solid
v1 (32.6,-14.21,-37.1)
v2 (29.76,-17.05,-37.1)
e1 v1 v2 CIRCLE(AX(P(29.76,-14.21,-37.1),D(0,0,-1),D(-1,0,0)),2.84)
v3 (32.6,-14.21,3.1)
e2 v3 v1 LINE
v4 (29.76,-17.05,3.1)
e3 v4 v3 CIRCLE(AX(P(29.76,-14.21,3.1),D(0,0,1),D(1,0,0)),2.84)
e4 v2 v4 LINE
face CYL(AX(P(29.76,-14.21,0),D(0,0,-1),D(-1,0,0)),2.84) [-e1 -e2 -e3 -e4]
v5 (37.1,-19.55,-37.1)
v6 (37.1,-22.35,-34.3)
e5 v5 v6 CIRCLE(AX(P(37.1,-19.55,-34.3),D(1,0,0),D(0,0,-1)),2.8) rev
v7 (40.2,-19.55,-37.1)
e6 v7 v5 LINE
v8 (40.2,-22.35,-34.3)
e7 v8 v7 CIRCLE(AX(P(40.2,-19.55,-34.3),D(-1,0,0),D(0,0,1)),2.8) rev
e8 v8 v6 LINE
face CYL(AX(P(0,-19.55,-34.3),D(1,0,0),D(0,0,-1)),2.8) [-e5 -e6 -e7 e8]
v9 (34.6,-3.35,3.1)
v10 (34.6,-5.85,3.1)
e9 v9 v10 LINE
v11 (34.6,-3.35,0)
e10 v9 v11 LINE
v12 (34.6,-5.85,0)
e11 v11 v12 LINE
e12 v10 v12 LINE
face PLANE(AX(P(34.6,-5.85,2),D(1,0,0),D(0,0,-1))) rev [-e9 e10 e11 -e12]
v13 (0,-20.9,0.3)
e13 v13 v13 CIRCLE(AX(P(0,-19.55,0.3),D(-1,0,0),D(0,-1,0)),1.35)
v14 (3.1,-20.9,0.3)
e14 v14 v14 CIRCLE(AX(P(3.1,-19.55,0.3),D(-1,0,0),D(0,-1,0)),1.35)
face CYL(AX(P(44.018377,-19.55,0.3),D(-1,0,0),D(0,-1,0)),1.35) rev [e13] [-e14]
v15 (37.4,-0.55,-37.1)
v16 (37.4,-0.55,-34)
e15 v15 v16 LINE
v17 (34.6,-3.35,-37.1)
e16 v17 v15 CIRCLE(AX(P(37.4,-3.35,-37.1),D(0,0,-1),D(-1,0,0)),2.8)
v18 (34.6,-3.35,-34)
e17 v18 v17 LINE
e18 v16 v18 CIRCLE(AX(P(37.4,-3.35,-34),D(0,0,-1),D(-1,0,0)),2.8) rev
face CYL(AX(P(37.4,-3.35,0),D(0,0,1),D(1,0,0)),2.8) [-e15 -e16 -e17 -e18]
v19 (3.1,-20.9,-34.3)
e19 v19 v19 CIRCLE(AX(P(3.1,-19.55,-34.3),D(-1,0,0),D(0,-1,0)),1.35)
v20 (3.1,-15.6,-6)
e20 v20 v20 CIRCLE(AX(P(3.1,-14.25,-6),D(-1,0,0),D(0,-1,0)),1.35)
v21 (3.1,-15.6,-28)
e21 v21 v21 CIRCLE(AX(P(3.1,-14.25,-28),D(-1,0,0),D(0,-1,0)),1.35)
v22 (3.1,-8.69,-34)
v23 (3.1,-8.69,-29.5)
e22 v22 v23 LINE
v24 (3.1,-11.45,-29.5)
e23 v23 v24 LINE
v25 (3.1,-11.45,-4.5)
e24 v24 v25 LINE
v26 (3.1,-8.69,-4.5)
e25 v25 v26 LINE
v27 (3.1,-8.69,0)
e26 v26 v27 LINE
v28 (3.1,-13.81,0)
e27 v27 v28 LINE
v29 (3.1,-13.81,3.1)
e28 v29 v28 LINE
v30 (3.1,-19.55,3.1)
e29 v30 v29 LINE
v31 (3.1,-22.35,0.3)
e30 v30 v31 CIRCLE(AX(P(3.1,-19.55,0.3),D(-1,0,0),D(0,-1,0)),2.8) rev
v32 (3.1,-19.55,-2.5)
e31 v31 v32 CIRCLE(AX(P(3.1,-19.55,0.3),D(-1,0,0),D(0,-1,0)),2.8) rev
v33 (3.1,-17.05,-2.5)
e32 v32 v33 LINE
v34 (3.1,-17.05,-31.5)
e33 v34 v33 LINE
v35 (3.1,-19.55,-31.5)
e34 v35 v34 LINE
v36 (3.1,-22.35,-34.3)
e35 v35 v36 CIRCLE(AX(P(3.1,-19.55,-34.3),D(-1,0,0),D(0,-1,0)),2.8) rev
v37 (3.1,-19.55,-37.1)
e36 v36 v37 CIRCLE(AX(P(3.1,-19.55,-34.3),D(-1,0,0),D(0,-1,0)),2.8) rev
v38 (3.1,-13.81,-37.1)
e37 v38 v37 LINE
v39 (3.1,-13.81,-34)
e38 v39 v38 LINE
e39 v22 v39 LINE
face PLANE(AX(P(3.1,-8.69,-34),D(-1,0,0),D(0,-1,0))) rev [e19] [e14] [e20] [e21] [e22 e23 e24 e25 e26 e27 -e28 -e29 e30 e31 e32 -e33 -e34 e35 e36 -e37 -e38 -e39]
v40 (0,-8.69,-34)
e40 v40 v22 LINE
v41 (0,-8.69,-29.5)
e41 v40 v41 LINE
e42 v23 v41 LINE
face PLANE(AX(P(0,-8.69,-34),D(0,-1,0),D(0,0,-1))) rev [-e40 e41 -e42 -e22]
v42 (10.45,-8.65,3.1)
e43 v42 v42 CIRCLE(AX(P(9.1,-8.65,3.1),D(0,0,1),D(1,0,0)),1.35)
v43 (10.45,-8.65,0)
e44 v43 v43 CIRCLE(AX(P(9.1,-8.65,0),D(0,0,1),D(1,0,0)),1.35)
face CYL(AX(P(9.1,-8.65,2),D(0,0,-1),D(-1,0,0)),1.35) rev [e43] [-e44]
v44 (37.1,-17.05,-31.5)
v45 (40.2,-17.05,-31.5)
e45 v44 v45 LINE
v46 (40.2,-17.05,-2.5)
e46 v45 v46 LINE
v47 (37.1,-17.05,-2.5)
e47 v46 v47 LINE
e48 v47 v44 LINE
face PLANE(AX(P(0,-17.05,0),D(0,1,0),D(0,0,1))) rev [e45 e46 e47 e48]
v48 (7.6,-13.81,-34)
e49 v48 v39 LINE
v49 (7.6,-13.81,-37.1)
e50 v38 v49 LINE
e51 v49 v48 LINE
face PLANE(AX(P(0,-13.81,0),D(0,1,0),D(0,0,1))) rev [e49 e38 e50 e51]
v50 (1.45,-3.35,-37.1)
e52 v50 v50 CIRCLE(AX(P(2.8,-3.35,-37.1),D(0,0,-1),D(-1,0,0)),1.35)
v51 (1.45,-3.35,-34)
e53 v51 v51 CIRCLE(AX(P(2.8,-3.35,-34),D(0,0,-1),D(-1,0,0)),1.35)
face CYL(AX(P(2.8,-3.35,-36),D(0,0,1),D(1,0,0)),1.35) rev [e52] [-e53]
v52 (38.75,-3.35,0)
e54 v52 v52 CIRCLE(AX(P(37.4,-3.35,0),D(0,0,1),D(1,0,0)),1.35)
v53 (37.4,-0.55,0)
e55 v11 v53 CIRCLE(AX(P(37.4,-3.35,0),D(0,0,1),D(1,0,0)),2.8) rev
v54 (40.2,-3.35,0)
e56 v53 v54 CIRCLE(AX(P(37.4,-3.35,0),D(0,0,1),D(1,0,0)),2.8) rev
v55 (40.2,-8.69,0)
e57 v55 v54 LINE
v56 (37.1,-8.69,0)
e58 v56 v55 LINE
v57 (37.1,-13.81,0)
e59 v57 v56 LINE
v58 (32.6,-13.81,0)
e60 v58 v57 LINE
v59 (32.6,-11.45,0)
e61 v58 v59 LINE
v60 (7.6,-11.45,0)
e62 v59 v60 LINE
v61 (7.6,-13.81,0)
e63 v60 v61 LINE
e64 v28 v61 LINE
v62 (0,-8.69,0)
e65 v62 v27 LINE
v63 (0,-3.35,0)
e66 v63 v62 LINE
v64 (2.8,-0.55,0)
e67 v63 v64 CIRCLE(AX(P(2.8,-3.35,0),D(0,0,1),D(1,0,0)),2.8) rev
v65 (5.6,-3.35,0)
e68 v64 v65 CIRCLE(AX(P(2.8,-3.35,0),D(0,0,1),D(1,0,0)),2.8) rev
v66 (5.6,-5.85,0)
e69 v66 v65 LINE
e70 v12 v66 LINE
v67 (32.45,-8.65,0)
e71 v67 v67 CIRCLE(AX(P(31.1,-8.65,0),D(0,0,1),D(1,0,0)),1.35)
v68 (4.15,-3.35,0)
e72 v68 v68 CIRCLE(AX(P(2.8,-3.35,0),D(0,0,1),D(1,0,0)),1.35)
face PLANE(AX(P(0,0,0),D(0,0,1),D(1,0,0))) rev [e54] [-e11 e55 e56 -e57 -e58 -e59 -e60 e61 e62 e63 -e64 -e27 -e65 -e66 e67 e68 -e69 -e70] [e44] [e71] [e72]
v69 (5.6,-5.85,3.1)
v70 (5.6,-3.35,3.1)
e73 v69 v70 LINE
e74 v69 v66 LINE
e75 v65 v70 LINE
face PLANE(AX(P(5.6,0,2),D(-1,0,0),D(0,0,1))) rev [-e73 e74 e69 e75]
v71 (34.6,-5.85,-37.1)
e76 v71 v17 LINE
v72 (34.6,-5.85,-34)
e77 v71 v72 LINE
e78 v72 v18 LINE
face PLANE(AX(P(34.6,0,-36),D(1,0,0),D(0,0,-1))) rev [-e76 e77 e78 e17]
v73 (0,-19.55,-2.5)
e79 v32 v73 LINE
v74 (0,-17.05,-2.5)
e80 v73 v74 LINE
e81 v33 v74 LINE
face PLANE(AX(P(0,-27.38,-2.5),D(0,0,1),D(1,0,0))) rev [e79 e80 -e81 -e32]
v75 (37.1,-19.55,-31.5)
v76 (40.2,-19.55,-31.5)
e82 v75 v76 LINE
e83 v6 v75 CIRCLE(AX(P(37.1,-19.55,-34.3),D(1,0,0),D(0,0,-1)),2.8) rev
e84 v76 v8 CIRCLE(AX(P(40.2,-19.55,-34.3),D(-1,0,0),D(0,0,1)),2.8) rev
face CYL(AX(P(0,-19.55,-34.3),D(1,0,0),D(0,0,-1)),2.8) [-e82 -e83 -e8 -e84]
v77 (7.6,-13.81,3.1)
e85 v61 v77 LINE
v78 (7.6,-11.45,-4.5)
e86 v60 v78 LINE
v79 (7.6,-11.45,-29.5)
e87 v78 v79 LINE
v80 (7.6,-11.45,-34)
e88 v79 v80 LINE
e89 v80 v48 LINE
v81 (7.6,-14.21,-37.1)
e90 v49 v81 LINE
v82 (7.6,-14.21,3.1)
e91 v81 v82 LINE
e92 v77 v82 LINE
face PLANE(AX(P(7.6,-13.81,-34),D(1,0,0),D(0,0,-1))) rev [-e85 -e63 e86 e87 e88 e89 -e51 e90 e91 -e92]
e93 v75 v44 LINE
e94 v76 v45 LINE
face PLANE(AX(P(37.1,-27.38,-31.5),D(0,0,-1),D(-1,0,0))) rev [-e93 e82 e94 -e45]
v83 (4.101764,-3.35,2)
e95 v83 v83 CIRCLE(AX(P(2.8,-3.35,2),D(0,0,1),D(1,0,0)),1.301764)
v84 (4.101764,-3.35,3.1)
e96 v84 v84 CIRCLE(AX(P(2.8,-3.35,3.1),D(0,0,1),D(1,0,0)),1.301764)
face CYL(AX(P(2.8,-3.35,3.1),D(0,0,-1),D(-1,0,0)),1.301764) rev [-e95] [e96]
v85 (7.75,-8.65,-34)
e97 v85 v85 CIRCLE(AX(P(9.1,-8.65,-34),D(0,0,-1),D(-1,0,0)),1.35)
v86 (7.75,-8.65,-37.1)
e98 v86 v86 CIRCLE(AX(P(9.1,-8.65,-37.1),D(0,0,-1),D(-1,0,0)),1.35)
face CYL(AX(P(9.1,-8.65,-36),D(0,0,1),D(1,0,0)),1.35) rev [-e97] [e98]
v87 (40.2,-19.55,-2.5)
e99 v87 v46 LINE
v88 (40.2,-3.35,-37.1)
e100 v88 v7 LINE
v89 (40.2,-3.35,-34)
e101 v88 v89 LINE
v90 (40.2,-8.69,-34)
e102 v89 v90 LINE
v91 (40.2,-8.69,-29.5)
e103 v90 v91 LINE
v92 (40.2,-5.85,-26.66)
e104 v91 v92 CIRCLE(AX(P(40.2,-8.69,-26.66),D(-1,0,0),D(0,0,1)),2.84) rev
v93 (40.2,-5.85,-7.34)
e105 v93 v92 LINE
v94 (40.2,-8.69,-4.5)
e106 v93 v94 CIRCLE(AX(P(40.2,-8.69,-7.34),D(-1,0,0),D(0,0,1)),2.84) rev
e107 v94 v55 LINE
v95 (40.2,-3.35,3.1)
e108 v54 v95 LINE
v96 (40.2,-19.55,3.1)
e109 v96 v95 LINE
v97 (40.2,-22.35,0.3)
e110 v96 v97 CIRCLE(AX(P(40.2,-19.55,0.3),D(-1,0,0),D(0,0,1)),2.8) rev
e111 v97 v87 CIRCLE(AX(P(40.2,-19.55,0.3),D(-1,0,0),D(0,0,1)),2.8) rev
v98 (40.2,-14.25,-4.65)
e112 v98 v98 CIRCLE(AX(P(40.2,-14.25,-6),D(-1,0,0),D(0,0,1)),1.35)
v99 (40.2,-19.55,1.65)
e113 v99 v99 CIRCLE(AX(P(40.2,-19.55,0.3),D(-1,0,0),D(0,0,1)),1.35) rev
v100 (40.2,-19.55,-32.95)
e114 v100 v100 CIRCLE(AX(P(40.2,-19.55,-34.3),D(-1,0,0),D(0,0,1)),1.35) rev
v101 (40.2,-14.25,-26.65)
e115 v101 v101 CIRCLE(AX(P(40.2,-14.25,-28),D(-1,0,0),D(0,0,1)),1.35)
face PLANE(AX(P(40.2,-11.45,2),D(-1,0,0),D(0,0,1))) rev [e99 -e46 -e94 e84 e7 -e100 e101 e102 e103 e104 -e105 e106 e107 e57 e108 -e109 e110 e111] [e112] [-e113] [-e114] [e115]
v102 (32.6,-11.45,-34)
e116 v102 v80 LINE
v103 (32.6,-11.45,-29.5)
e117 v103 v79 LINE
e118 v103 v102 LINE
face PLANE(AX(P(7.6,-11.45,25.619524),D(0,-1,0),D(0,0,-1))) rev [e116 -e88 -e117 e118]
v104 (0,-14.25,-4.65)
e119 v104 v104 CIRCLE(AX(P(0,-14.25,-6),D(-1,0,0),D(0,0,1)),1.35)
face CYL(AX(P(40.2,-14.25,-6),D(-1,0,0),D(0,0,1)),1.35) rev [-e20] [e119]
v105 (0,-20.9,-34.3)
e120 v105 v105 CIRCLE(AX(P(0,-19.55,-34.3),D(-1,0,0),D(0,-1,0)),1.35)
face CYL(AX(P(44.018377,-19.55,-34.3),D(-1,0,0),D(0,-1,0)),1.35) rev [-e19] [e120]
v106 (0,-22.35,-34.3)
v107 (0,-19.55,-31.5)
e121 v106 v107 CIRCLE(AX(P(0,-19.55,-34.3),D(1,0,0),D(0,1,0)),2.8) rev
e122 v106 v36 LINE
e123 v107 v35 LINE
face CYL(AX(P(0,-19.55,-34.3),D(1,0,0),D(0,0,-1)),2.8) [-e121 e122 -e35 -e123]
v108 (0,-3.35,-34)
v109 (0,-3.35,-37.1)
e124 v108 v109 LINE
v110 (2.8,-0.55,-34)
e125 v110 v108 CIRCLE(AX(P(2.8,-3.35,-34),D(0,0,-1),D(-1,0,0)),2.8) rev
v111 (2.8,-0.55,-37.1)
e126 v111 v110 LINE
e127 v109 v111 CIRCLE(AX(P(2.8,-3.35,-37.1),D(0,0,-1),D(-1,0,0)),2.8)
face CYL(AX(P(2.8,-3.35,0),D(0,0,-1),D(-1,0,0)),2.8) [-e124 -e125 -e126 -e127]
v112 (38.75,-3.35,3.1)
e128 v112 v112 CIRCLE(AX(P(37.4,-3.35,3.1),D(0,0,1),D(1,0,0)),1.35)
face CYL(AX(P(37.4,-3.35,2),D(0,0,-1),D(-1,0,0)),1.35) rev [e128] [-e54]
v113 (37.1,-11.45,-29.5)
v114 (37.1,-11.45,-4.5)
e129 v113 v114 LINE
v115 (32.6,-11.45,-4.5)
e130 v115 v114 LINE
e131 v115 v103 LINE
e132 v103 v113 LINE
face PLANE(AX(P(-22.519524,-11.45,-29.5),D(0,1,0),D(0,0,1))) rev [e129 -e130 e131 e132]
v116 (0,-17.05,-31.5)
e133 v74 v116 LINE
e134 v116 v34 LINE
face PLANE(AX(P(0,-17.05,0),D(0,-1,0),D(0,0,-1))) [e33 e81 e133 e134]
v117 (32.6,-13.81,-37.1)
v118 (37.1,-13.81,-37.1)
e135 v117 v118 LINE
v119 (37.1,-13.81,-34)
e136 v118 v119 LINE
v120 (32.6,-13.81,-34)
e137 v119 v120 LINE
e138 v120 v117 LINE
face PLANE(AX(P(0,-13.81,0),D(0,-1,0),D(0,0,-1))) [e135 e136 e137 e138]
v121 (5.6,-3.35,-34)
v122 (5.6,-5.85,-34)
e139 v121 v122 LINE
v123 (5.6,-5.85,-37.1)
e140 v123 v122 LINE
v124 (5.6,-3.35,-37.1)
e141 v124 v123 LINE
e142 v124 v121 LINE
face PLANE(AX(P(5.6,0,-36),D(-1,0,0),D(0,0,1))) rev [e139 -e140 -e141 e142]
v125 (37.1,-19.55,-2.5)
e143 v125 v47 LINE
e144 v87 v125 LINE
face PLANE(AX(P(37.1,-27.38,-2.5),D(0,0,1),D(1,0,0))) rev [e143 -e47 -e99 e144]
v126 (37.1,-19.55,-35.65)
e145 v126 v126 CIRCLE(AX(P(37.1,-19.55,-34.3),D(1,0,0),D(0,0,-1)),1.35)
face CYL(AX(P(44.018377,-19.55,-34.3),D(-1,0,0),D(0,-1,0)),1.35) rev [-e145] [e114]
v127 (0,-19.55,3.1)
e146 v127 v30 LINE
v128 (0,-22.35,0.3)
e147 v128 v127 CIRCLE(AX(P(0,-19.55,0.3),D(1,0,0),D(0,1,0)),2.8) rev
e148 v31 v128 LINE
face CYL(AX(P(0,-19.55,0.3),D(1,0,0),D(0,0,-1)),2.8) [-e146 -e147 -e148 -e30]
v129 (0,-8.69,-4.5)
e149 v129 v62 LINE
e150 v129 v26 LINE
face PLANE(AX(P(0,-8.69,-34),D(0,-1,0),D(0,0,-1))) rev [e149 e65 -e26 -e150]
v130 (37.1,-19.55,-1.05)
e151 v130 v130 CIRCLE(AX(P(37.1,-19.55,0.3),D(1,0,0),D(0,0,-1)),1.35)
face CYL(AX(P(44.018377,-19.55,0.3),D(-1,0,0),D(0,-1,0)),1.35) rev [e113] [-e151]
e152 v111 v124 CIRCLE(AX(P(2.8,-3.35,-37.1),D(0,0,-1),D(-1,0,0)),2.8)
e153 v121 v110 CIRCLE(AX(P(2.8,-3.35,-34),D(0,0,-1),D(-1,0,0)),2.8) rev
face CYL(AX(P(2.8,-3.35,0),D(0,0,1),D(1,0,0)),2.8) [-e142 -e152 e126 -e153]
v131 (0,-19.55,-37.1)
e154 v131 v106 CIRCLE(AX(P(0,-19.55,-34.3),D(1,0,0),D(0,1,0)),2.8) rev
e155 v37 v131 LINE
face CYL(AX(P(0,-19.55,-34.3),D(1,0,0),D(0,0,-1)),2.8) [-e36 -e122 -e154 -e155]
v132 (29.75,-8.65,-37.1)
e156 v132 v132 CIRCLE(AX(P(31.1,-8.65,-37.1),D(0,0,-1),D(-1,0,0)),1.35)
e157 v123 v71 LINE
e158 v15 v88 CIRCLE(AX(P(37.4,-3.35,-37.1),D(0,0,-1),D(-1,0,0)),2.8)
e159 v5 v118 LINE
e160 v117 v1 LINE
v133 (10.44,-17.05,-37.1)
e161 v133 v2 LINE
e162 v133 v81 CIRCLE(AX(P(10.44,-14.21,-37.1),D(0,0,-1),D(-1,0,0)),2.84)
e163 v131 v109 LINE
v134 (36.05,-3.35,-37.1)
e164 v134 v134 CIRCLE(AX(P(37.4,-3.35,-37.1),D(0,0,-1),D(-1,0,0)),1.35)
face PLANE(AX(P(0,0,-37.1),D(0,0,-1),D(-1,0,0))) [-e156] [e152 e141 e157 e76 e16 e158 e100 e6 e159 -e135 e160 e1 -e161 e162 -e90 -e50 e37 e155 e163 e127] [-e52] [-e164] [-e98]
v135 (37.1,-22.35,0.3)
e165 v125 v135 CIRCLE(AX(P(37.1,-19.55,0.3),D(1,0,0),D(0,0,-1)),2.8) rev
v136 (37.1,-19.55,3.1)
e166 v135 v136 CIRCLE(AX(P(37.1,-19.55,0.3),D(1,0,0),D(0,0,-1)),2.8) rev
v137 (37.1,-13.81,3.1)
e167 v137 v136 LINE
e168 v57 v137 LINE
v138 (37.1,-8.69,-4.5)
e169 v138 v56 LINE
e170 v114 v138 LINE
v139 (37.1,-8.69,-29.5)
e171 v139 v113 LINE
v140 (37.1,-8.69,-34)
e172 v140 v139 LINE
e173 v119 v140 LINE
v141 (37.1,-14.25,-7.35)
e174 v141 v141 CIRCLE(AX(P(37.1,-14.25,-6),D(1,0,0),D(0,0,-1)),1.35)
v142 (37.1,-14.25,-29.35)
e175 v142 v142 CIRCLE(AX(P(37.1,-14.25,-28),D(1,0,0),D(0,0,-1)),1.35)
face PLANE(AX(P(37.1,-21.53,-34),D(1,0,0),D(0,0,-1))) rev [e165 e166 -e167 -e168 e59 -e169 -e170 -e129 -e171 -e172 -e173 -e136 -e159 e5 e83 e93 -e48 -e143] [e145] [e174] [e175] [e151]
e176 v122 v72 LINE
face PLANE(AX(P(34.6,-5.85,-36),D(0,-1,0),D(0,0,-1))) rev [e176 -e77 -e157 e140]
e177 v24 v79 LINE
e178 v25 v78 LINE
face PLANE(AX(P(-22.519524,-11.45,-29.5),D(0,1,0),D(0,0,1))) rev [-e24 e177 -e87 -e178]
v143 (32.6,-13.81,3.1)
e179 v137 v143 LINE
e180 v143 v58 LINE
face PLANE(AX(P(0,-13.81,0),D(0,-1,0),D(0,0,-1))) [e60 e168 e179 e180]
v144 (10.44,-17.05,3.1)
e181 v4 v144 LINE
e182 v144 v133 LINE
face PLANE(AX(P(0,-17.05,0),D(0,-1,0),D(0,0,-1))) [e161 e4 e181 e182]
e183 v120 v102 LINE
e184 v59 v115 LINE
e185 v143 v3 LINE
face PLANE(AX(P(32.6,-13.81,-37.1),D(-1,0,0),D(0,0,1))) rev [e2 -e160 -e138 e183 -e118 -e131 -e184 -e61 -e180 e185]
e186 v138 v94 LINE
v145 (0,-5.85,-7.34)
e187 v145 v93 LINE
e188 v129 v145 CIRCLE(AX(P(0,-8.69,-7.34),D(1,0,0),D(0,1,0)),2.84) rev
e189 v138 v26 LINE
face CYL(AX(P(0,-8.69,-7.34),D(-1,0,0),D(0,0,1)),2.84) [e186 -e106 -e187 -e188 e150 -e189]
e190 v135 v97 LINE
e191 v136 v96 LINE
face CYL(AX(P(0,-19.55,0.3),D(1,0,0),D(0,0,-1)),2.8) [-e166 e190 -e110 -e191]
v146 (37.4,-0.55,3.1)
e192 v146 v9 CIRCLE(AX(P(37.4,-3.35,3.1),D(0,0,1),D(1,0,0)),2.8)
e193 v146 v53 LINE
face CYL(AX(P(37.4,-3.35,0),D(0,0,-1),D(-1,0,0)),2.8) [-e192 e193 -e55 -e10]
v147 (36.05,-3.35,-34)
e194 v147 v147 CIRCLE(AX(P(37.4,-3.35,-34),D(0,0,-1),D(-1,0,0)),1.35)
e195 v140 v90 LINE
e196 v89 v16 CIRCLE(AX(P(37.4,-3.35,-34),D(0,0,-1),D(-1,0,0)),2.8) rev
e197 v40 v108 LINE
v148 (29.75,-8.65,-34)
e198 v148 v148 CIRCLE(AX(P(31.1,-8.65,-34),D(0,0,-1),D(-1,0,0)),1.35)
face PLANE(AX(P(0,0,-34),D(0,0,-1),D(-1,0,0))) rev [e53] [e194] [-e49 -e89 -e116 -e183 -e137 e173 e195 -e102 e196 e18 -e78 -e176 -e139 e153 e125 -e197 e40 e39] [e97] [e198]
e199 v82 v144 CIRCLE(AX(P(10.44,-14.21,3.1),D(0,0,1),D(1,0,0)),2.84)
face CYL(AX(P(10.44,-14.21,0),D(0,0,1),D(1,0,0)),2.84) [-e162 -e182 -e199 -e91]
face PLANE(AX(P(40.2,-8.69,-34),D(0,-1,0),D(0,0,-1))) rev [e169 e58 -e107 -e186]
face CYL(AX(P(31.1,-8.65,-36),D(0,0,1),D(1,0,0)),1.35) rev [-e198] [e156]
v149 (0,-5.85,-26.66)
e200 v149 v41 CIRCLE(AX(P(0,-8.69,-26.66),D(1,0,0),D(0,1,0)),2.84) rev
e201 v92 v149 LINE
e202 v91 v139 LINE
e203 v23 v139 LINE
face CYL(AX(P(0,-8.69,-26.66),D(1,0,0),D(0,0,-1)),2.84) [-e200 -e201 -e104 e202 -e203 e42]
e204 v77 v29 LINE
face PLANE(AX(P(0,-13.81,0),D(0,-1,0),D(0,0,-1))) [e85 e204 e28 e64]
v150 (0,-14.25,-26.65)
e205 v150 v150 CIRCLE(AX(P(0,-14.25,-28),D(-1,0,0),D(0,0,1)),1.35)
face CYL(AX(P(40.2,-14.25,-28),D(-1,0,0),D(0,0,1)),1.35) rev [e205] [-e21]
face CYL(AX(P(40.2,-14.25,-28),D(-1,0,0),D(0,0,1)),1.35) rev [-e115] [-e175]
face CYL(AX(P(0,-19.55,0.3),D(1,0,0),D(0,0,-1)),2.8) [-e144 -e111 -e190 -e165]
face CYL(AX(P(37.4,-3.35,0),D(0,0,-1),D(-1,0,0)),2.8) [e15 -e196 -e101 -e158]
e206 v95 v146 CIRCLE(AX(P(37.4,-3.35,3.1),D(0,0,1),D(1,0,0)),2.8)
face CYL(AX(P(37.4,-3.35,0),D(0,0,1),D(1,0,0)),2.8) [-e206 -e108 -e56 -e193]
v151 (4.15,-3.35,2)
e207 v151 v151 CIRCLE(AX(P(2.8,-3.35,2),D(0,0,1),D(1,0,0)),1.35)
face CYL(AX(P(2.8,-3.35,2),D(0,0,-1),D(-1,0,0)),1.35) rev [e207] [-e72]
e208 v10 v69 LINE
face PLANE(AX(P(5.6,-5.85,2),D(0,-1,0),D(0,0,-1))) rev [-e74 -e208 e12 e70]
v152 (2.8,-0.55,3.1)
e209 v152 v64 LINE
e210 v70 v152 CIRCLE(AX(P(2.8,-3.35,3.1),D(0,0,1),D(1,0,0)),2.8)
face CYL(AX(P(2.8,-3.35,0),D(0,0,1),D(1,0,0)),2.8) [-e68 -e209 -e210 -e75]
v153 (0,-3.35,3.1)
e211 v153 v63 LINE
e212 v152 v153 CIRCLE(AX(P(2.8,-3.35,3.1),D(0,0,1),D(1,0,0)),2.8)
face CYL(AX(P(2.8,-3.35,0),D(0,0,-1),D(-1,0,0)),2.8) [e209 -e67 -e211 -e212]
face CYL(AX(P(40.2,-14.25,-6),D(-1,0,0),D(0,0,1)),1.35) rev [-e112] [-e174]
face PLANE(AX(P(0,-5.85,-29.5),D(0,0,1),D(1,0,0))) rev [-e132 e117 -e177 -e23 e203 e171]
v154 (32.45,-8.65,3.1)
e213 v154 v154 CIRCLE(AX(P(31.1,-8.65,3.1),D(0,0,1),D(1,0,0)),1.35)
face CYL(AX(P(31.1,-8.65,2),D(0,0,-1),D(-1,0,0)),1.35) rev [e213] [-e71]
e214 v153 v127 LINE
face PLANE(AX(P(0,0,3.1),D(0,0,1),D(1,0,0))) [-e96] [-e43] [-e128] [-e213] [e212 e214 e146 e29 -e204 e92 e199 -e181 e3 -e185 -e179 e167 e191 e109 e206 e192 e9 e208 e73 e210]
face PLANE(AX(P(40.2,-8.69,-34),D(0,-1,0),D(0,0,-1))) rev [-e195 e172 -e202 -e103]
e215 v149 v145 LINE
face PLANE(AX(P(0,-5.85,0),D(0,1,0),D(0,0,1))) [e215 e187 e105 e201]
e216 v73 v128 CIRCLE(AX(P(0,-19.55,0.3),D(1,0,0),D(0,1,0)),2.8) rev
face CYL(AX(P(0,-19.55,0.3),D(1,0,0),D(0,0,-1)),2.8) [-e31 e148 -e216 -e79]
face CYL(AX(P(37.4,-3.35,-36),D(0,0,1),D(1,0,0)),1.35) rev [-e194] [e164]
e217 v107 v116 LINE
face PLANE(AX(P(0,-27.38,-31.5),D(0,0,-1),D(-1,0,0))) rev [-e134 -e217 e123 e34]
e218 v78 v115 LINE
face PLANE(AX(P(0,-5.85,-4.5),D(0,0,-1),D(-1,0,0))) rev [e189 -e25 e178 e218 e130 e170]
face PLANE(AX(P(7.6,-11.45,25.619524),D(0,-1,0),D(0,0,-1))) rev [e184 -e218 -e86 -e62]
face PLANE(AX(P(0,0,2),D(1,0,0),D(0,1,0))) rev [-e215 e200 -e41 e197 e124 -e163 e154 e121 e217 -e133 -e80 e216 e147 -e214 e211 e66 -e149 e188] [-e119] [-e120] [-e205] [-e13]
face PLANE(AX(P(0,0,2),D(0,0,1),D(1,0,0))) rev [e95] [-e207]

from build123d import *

# Parameters (mm, degrees)
ESBO_O1_R                  = 1.35
RESSALTO_EXTRUS_O1_DEPTH   = 2
ESBO_O3_W                  = 40.2
ESBO_O3_H                  = 2
RESSALTO_EXTRUS_O2_DEPTH   = 10.08
ESBO_O4_W                  = 3.1
ESBO_O4_H                  = 12.84
RESSALTO_EXTRUS_O3_DEPTH   = 34
CORTE_EXTRUS_O1_DEPTH      = 55.735280213
CORTE_EXTRUS_O1_DEPTH_BACK = 55.735280213
ESBO_O5_R                  = 1.35
ESBO_O7_W                  = 37.1
ESBO_O7_H                  = 3.24
CORTE_EXTRUS_O2_DEPTH      = 2
RESSALTO_EXTRUS_O5_START   = 2
ESBO_O12_R                 = 1.35
RESSALTO_EXTRUS_O5_DEPTH   = 2
ESBO_O18_W                 = 3.1
ESBO_O18_H                 = 3.24
RESSALTO_EXTRUS_O6_DEPTH   = 2
ESBO_O19_W                 = 3.1
ESBO_O19_H                 = 3.24
RESSALTO_EXTRUS_O7_DEPTH   = 2
ESBO_O21_R                 = 1.301764144
ESBO_O21_R_2               = 1.35
RESSALTO_EXTRUS_O8_DEPTH   = 1.1
RESSALTO_EXTRUS_O9_START   = 1.1
ESBO_O22_R                 = 1.35
RESSALTO_EXTRUS_O9_DEPTH   = 1.1
ESBO_O23_W                 = 3.1
ESBO_O23_H                 = 5.6
RESSALTO_EXTRUS_O10_DEPTH  = 5.85
CORTE_EXTRUS_O3_REACH      = 63.173
ESBO_O24_R                 = 1.35
ESBO_O25_W                 = 4.5
ESBO_O25_H                 = 3.1
CORTE_EXTRUS_O6_DEPTH      = 4.48
ESBO_O27_W                 = 3.1
ESBO_O27_H                 = 29
CORTE_EXTRUS_O7_DEPTH      = 4.48
ESBO_O28_W                 = 25
ESBO_O28_H                 = 40.2
CORTE_EXTRUS_O8_DEPTH      = 1.24
ESBO_O29_W                 = 25
ESBO_O29_H                 = 5.6
RESSALTO_EXTRUS_O11_DEPTH  = 34
ESBO_O31_W                 = 3.1
ESBO_O31_H                 = 25
RESSALTO_EXTRUS_O12_DEPTH  = 2.84
ESBO_O32_W                 = 25
ESBO_O32_H                 = 5.6
RESSALTO_EXTRUS_O13_DEPTH  = 34
FILETE1_R                  = 2.84
ESBO_O33_W                 = 5.6
ESBO_O33_H                 = 3.1
CORTE_EXTRUS_O9_DEPTH      = 0.55
ESBO_O35_W                 = 3.1
ESBO_O35_H                 = 5.6
CORTE_EXTRUS_O10_DEPTH     = 5.03
FILETE2_R                  = 2.8


with BuildPart() as part:
    # Esboço1 → Ressalto-extrusão1 (new body)
    with BuildSketch(Plane.XY):
        Polygon((0, 0), (5.6, 0), (5.6, -5.85), (34.6, -5.85), (34.6, 0), (40.2, 0), (40.2, -11.45), (0, -11.45), align=None)
        with Locations((2.8, -3.35)):
            Circle(ESBO_O1_R, mode=Mode.SUBTRACT)
        with Locations((37.4, -3.35)):
            Circle(ESBO_O1_R, mode=Mode.SUBTRACT)
        with Locations((31.1, -8.65)):
            Circle(ESBO_O1_R, mode=Mode.SUBTRACT)
        with Locations((9.1, -8.65)):
            Circle(ESBO_O1_R, mode=Mode.SUBTRACT)
    extrude(amount=RESSALTO_EXTRUS_O1_DEPTH)

    # Esboço3 → Ressalto-extrusão2 (add)
    with BuildSketch(Plane.XZ.offset(11.45)):
        with Locations((20.1, 1)):
            Rectangle(ESBO_O3_W, ESBO_O3_H)
    extrude(amount=RESSALTO_EXTRUS_O2_DEPTH)

    # Esboço4 → Ressalto-extrusão3 (add)
    with BuildSketch(Plane(origin=(0, 0, 0), x_dir=(-1, 0, 0), z_dir=(0, 0, -1))):
        with Locations((-38.65, -15.11)):
            Rectangle(ESBO_O4_W, ESBO_O4_H)
        with Locations((-1.55, -15.11)):
            Rectangle(ESBO_O4_W, ESBO_O4_H)
    extrude(amount=RESSALTO_EXTRUS_O3_DEPTH)

    # Esboço5 → Corte-extrusão1 (cut, two sides: drawn at the far end of the back side and taken through both)
    with BuildSketch(Plane.ZY.offset(-37.1).offset(-CORTE_EXTRUS_O1_DEPTH_BACK)):
        with Locations((-6, -14.25)):
            Circle(ESBO_O5_R)
        with Locations((-28, -14.25)):
            Circle(ESBO_O5_R)
    extrude(amount=CORTE_EXTRUS_O1_DEPTH + CORTE_EXTRUS_O1_DEPTH_BACK, mode=Mode.SUBTRACT)

    # Esboço7 → Corte-extrusão2 (cut)
    with BuildSketch(Plane(origin=(0, 0, 0), x_dir=(-1, 0, 0), z_dir=(0, 0, -1))):
        with Locations((-18.55, -19.91)):
            Rectangle(ESBO_O7_W, ESBO_O7_H)
    extrude(amount=-CORTE_EXTRUS_O2_DEPTH, mode=Mode.SUBTRACT)

    # Esboço12 → Ressalto-extrusão5 (add)
    with BuildSketch(Plane(origin=(0, 0, -34), x_dir=(-1, 0, 0), z_dir=(0, 0, -1)).offset(RESSALTO_EXTRUS_O5_START)):
        Polygon((-5.6, 0), (0, 0), (0, -18.29), (-40.2, -18.29), (-40.2, 0), (-34.6, 0), (-34.6, -5.85), (-5.6, -5.85), align=None)
        with Locations(Location((-31.1, -8.65, 0), (0, 0, 180))):
            Circle(ESBO_O12_R, mode=Mode.SUBTRACT)
        with Locations(Location((-9.1, -8.65, 0), (0, 0, 180))):
            Circle(ESBO_O12_R, mode=Mode.SUBTRACT)
        with Locations(Location((-2.8, -3.35, 0), (0, 0, 180))):
            Circle(ESBO_O12_R, mode=Mode.SUBTRACT)
        with Locations(Location((-37.4, -3.35, 0), (0, 0, 180))):
            Circle(ESBO_O12_R, mode=Mode.SUBTRACT)
    extrude(amount=-RESSALTO_EXTRUS_O5_DEPTH)

    # Esboço18 → Ressalto-extrusão6 (add)
    with BuildSketch(Plane.XY):
        with Locations((1.55, -19.91)):
            Rectangle(ESBO_O18_W, ESBO_O18_H)
    extrude(amount=RESSALTO_EXTRUS_O6_DEPTH)

    # Esboço19 → Ressalto-extrusão7 (add)
    with BuildSketch(Plane(origin=(0, 0, -34), x_dir=(-1, 0, 0), z_dir=(0, 0, -1))):
        with Locations((-1.55, -19.91)):
            Rectangle(ESBO_O19_W, ESBO_O19_H)
        with Locations((-38.65, -19.91)):
            Rectangle(ESBO_O19_W, ESBO_O19_H)
    extrude(amount=RESSALTO_EXTRUS_O7_DEPTH)

    # Esboço21 → Ressalto-extrusão8 (add)
    with BuildSketch(Plane.XY.offset(2)):
        Polygon((37.1, -21.53), (40.2, -21.53), (40.2, 0), (34.6, 0), (34.6, -5.85), (5.6, -5.85), (5.6, 0), (0, 0), (0, -21.53), (3.1, -21.53), (3.1, -18.29), (37.1, -18.29), align=None)
        with Locations((2.8, -3.35)):
            Circle(ESBO_O21_R, mode=Mode.SUBTRACT)
        with Locations((9.1, -8.65)):
            Circle(ESBO_O21_R_2, mode=Mode.SUBTRACT)
        with Locations((31.1, -8.65)):
            Circle(ESBO_O21_R_2, mode=Mode.SUBTRACT)
        with Locations((37.4, -3.35)):
            Circle(ESBO_O21_R_2, mode=Mode.SUBTRACT)
    extrude(amount=RESSALTO_EXTRUS_O8_DEPTH)

    # Esboço22 → Ressalto-extrusão9 (add)
    with BuildSketch(Plane(origin=(0, 0, -36), x_dir=(-1, 0, 0), z_dir=(0, 0, -1)).offset(RESSALTO_EXTRUS_O9_START)):
        Polygon((-5.6, 0), (0, 0), (0, -21.53), (-3.1, -21.53), (-3.1, -18.29), (-37.1, -18.29), (-37.1, -21.53), (-40.2, -21.53), (-40.2, 0), (-34.6, 0), (-34.6, -5.85), (-5.6, -5.85), align=None)
        with Locations(Location((-37.4, -3.35, 0), (0, 0, 180))):
            Circle(ESBO_O22_R, mode=Mode.SUBTRACT)
        with Locations(Location((-31.1, -8.65, 0), (0, 0, 180))):
            Circle(ESBO_O22_R, mode=Mode.SUBTRACT)
        with Locations(Location((-9.1, -8.65, 0), (0, 0, 180))):
            Circle(ESBO_O22_R, mode=Mode.SUBTRACT)
        with Locations(Location((-2.8, -3.35, 0), (0, 0, 180))):
            Circle(ESBO_O22_R, mode=Mode.SUBTRACT)
    extrude(amount=-RESSALTO_EXTRUS_O9_DEPTH)

    # Esboço23 → Ressalto-extrusão10 (add)
    with BuildSketch(Plane.XZ.offset(21.53)):
        with Locations((1.55, 0.3)):
            Rectangle(ESBO_O23_W, ESBO_O23_H)
        with Locations((1.55, -34.3)):
            Rectangle(ESBO_O23_W, ESBO_O23_H)
        with Locations((38.65, -34.3)):
            Rectangle(ESBO_O23_W, ESBO_O23_H)
        with Locations((38.65, 0.3)):
            Rectangle(ESBO_O23_W, ESBO_O23_H)
    extrude(amount=RESSALTO_EXTRUS_O10_DEPTH)

    # Corte-extrusão3: up to this face of the body (flat: up to its plane)
    corte_extrus_o3_end = Plane(part.part.faces().sort_by_distance((40.2, -15.177512698, -17))[0])
    # Esboço24 → Corte-extrusão3 (cut, up to the picked face)
    with BuildSketch(Plane.ZY, mode=Mode.PRIVATE) as corte_extrus_o3_sk1:
        with Locations(Location((-34.3, -19.55, 0), (0, 0, 270))):
            Circle(ESBO_O24_R)
    corte_extrus_o3_tool1 = split(extrude(corte_extrus_o3_sk1.sketch, amount=-CORTE_EXTRUS_O3_REACH, mode=Mode.PRIVATE), bisect_by=corte_extrus_o3_end, keep=Keep.BOTH, mode=Mode.PRIVATE)
    # Esboço24 → Corte-extrusão3 (cut, up to the picked face)
    with BuildSketch(Plane.ZY, mode=Mode.PRIVATE) as corte_extrus_o3_sk2:
        with Locations(Location((0.3, -19.55, 0), (0, 0, 270))):
            Circle(ESBO_O24_R)
    corte_extrus_o3_tool2 = split(extrude(corte_extrus_o3_sk2.sketch, amount=-CORTE_EXTRUS_O3_REACH, mode=Mode.PRIVATE), bisect_by=corte_extrus_o3_end, keep=Keep.BOTH, mode=Mode.PRIVATE)
    add(corte_extrus_o3_tool1.solids().sort_by(Axis((0, -19.55, -34.3), (1, 0, 0)))[0], mode=Mode.SUBTRACT)
    add(corte_extrus_o3_tool2.solids().sort_by(Axis((0, -19.55, 0.3), (1, 0, 0)))[0], mode=Mode.SUBTRACT)

    # Esboço25 → Corte-extrusão6 (cut)
    with BuildSketch(Plane.XZ.offset(18.29)):
        with Locations((5.35, -35.55)):
            Rectangle(ESBO_O25_W, ESBO_O25_H)
        with Locations((34.85, -35.55)):
            Rectangle(ESBO_O25_W, ESBO_O25_H)
        with Locations((34.85, 1.55)):
            Rectangle(ESBO_O25_W, ESBO_O25_H)
        with Locations((5.35, 1.55)):
            Rectangle(ESBO_O25_W, ESBO_O25_H)
    extrude(amount=-CORTE_EXTRUS_O6_DEPTH, mode=Mode.SUBTRACT)

    # Esboço27 → Corte-extrusão7 (cut)
    with BuildSketch(Plane.XZ.offset(21.53)):
        with Locations((1.55, -17)):
            Rectangle(ESBO_O27_W, ESBO_O27_H)
        with Locations((38.65, -17)):
            Rectangle(ESBO_O27_W, ESBO_O27_H)
    extrude(amount=-CORTE_EXTRUS_O7_DEPTH, mode=Mode.SUBTRACT)

    # Esboço28 → Corte-extrusão8 (cut)
    with BuildSketch(Plane.XZ.offset(18.29)):
        with Locations((20.1, -17)):
            Rectangle(ESBO_O28_W, ESBO_O28_H)
    extrude(amount=-CORTE_EXTRUS_O8_DEPTH, mode=Mode.SUBTRACT)

    # Esboço29 → Ressalto-extrusão11 (add)
    with BuildSketch(Plane.XY.offset(-34)):
        with Locations((20.1, -14.25)):
            Rectangle(ESBO_O29_W, ESBO_O29_H)
    extrude(amount=RESSALTO_EXTRUS_O11_DEPTH)

    # Esboço31 → Ressalto-extrusão12 (add)
    with BuildSketch(Plane(origin=(0, -8.69, 0), x_dir=(1, 0, 0), z_dir=(0, 1, 0))):
        with Locations((1.55, 17)):
            Rectangle(ESBO_O31_W, ESBO_O31_H)
        with Locations((38.65, 17)):
            Rectangle(ESBO_O31_W, ESBO_O31_H)
    extrude(amount=RESSALTO_EXTRUS_O12_DEPTH)

    # Esboço32 → Ressalto-extrusão13 (add)
    with BuildSketch(Plane.ZY.offset(-37.1)):
        with Locations((-17, -8.65)):
            Rectangle(ESBO_O32_W, ESBO_O32_H)
    extrude(amount=RESSALTO_EXTRUS_O13_DEPTH)

    # Filete1
    filete1_edges = [part.edges().sort_by_distance(p)[0] for p in [
        (32.6, -17.05, -17),
        (7.6, -17.05, -17),
        (20.1, -5.85, -29.5),
        (20.1, -5.85, -4.5),
    ]]
    fillet(filete1_edges, radius=FILETE1_R)

    # Esboço33 → Corte-extrusão9 (cut)
    with BuildSketch(Plane(origin=(0, 0, 0), x_dir=(1, 0, 0), z_dir=(0, 1, 0))):
        with Locations((2.8, 35.55)):
            Rectangle(ESBO_O33_W, ESBO_O33_H)
        with Locations((37.4, 35.55)):
            Rectangle(ESBO_O33_W, ESBO_O33_H)
        with Locations((37.4, -1.55)):
            Rectangle(ESBO_O33_W, ESBO_O33_H)
        with Locations((2.8, -1.55)):
            Rectangle(ESBO_O33_W, ESBO_O33_H)
    extrude(amount=-CORTE_EXTRUS_O9_DEPTH, mode=Mode.SUBTRACT)

    # Esboço35 → Corte-extrusão10 (cut)
    with BuildSketch(Plane.XZ.offset(27.38)):
        with Locations((1.55, 0.3)):
            Rectangle(ESBO_O35_W, ESBO_O35_H)
        with Locations((38.65, 0.3)):
            Rectangle(ESBO_O35_W, ESBO_O35_H)
        with Locations((38.65, -34.3)):
            Rectangle(ESBO_O35_W, ESBO_O35_H)
        with Locations((1.55, -34.3)):
            Rectangle(ESBO_O35_W, ESBO_O35_H)
    extrude(amount=-CORTE_EXTRUS_O10_DEPTH, mode=Mode.SUBTRACT)

    # Filete2
    filete2_edges = [part.edges().sort_by_distance(p)[0] for p in [
        (34.6, -0.55, 1.55),
        (40.2, -0.55, 1.55),
        (0, -0.55, 1.55),
        (5.6, -0.55, 1.55),
        (40.2, -0.55, -35.55),
        (34.6, -0.55, -35.55),
        (5.6, -0.55, -35.55),
        (0, -0.55, -35.55),
        (1.55, -22.35, -31.5),
        (1.55, -22.35, -37.1),
        (38.65, -22.35, -37.1),
        (38.65, -22.35, -31.5),
        (38.65, -22.35, -2.5),
        (38.65, -22.35, 3.1),
        (1.55, -22.35, -2.5),
        (1.55, -22.35, 3.1),
    ]]
    fillet(filete2_edges, radius=FILETE2_R - 0.0001)  # a hair under: the kernel refuses the full size


solid = part.part
